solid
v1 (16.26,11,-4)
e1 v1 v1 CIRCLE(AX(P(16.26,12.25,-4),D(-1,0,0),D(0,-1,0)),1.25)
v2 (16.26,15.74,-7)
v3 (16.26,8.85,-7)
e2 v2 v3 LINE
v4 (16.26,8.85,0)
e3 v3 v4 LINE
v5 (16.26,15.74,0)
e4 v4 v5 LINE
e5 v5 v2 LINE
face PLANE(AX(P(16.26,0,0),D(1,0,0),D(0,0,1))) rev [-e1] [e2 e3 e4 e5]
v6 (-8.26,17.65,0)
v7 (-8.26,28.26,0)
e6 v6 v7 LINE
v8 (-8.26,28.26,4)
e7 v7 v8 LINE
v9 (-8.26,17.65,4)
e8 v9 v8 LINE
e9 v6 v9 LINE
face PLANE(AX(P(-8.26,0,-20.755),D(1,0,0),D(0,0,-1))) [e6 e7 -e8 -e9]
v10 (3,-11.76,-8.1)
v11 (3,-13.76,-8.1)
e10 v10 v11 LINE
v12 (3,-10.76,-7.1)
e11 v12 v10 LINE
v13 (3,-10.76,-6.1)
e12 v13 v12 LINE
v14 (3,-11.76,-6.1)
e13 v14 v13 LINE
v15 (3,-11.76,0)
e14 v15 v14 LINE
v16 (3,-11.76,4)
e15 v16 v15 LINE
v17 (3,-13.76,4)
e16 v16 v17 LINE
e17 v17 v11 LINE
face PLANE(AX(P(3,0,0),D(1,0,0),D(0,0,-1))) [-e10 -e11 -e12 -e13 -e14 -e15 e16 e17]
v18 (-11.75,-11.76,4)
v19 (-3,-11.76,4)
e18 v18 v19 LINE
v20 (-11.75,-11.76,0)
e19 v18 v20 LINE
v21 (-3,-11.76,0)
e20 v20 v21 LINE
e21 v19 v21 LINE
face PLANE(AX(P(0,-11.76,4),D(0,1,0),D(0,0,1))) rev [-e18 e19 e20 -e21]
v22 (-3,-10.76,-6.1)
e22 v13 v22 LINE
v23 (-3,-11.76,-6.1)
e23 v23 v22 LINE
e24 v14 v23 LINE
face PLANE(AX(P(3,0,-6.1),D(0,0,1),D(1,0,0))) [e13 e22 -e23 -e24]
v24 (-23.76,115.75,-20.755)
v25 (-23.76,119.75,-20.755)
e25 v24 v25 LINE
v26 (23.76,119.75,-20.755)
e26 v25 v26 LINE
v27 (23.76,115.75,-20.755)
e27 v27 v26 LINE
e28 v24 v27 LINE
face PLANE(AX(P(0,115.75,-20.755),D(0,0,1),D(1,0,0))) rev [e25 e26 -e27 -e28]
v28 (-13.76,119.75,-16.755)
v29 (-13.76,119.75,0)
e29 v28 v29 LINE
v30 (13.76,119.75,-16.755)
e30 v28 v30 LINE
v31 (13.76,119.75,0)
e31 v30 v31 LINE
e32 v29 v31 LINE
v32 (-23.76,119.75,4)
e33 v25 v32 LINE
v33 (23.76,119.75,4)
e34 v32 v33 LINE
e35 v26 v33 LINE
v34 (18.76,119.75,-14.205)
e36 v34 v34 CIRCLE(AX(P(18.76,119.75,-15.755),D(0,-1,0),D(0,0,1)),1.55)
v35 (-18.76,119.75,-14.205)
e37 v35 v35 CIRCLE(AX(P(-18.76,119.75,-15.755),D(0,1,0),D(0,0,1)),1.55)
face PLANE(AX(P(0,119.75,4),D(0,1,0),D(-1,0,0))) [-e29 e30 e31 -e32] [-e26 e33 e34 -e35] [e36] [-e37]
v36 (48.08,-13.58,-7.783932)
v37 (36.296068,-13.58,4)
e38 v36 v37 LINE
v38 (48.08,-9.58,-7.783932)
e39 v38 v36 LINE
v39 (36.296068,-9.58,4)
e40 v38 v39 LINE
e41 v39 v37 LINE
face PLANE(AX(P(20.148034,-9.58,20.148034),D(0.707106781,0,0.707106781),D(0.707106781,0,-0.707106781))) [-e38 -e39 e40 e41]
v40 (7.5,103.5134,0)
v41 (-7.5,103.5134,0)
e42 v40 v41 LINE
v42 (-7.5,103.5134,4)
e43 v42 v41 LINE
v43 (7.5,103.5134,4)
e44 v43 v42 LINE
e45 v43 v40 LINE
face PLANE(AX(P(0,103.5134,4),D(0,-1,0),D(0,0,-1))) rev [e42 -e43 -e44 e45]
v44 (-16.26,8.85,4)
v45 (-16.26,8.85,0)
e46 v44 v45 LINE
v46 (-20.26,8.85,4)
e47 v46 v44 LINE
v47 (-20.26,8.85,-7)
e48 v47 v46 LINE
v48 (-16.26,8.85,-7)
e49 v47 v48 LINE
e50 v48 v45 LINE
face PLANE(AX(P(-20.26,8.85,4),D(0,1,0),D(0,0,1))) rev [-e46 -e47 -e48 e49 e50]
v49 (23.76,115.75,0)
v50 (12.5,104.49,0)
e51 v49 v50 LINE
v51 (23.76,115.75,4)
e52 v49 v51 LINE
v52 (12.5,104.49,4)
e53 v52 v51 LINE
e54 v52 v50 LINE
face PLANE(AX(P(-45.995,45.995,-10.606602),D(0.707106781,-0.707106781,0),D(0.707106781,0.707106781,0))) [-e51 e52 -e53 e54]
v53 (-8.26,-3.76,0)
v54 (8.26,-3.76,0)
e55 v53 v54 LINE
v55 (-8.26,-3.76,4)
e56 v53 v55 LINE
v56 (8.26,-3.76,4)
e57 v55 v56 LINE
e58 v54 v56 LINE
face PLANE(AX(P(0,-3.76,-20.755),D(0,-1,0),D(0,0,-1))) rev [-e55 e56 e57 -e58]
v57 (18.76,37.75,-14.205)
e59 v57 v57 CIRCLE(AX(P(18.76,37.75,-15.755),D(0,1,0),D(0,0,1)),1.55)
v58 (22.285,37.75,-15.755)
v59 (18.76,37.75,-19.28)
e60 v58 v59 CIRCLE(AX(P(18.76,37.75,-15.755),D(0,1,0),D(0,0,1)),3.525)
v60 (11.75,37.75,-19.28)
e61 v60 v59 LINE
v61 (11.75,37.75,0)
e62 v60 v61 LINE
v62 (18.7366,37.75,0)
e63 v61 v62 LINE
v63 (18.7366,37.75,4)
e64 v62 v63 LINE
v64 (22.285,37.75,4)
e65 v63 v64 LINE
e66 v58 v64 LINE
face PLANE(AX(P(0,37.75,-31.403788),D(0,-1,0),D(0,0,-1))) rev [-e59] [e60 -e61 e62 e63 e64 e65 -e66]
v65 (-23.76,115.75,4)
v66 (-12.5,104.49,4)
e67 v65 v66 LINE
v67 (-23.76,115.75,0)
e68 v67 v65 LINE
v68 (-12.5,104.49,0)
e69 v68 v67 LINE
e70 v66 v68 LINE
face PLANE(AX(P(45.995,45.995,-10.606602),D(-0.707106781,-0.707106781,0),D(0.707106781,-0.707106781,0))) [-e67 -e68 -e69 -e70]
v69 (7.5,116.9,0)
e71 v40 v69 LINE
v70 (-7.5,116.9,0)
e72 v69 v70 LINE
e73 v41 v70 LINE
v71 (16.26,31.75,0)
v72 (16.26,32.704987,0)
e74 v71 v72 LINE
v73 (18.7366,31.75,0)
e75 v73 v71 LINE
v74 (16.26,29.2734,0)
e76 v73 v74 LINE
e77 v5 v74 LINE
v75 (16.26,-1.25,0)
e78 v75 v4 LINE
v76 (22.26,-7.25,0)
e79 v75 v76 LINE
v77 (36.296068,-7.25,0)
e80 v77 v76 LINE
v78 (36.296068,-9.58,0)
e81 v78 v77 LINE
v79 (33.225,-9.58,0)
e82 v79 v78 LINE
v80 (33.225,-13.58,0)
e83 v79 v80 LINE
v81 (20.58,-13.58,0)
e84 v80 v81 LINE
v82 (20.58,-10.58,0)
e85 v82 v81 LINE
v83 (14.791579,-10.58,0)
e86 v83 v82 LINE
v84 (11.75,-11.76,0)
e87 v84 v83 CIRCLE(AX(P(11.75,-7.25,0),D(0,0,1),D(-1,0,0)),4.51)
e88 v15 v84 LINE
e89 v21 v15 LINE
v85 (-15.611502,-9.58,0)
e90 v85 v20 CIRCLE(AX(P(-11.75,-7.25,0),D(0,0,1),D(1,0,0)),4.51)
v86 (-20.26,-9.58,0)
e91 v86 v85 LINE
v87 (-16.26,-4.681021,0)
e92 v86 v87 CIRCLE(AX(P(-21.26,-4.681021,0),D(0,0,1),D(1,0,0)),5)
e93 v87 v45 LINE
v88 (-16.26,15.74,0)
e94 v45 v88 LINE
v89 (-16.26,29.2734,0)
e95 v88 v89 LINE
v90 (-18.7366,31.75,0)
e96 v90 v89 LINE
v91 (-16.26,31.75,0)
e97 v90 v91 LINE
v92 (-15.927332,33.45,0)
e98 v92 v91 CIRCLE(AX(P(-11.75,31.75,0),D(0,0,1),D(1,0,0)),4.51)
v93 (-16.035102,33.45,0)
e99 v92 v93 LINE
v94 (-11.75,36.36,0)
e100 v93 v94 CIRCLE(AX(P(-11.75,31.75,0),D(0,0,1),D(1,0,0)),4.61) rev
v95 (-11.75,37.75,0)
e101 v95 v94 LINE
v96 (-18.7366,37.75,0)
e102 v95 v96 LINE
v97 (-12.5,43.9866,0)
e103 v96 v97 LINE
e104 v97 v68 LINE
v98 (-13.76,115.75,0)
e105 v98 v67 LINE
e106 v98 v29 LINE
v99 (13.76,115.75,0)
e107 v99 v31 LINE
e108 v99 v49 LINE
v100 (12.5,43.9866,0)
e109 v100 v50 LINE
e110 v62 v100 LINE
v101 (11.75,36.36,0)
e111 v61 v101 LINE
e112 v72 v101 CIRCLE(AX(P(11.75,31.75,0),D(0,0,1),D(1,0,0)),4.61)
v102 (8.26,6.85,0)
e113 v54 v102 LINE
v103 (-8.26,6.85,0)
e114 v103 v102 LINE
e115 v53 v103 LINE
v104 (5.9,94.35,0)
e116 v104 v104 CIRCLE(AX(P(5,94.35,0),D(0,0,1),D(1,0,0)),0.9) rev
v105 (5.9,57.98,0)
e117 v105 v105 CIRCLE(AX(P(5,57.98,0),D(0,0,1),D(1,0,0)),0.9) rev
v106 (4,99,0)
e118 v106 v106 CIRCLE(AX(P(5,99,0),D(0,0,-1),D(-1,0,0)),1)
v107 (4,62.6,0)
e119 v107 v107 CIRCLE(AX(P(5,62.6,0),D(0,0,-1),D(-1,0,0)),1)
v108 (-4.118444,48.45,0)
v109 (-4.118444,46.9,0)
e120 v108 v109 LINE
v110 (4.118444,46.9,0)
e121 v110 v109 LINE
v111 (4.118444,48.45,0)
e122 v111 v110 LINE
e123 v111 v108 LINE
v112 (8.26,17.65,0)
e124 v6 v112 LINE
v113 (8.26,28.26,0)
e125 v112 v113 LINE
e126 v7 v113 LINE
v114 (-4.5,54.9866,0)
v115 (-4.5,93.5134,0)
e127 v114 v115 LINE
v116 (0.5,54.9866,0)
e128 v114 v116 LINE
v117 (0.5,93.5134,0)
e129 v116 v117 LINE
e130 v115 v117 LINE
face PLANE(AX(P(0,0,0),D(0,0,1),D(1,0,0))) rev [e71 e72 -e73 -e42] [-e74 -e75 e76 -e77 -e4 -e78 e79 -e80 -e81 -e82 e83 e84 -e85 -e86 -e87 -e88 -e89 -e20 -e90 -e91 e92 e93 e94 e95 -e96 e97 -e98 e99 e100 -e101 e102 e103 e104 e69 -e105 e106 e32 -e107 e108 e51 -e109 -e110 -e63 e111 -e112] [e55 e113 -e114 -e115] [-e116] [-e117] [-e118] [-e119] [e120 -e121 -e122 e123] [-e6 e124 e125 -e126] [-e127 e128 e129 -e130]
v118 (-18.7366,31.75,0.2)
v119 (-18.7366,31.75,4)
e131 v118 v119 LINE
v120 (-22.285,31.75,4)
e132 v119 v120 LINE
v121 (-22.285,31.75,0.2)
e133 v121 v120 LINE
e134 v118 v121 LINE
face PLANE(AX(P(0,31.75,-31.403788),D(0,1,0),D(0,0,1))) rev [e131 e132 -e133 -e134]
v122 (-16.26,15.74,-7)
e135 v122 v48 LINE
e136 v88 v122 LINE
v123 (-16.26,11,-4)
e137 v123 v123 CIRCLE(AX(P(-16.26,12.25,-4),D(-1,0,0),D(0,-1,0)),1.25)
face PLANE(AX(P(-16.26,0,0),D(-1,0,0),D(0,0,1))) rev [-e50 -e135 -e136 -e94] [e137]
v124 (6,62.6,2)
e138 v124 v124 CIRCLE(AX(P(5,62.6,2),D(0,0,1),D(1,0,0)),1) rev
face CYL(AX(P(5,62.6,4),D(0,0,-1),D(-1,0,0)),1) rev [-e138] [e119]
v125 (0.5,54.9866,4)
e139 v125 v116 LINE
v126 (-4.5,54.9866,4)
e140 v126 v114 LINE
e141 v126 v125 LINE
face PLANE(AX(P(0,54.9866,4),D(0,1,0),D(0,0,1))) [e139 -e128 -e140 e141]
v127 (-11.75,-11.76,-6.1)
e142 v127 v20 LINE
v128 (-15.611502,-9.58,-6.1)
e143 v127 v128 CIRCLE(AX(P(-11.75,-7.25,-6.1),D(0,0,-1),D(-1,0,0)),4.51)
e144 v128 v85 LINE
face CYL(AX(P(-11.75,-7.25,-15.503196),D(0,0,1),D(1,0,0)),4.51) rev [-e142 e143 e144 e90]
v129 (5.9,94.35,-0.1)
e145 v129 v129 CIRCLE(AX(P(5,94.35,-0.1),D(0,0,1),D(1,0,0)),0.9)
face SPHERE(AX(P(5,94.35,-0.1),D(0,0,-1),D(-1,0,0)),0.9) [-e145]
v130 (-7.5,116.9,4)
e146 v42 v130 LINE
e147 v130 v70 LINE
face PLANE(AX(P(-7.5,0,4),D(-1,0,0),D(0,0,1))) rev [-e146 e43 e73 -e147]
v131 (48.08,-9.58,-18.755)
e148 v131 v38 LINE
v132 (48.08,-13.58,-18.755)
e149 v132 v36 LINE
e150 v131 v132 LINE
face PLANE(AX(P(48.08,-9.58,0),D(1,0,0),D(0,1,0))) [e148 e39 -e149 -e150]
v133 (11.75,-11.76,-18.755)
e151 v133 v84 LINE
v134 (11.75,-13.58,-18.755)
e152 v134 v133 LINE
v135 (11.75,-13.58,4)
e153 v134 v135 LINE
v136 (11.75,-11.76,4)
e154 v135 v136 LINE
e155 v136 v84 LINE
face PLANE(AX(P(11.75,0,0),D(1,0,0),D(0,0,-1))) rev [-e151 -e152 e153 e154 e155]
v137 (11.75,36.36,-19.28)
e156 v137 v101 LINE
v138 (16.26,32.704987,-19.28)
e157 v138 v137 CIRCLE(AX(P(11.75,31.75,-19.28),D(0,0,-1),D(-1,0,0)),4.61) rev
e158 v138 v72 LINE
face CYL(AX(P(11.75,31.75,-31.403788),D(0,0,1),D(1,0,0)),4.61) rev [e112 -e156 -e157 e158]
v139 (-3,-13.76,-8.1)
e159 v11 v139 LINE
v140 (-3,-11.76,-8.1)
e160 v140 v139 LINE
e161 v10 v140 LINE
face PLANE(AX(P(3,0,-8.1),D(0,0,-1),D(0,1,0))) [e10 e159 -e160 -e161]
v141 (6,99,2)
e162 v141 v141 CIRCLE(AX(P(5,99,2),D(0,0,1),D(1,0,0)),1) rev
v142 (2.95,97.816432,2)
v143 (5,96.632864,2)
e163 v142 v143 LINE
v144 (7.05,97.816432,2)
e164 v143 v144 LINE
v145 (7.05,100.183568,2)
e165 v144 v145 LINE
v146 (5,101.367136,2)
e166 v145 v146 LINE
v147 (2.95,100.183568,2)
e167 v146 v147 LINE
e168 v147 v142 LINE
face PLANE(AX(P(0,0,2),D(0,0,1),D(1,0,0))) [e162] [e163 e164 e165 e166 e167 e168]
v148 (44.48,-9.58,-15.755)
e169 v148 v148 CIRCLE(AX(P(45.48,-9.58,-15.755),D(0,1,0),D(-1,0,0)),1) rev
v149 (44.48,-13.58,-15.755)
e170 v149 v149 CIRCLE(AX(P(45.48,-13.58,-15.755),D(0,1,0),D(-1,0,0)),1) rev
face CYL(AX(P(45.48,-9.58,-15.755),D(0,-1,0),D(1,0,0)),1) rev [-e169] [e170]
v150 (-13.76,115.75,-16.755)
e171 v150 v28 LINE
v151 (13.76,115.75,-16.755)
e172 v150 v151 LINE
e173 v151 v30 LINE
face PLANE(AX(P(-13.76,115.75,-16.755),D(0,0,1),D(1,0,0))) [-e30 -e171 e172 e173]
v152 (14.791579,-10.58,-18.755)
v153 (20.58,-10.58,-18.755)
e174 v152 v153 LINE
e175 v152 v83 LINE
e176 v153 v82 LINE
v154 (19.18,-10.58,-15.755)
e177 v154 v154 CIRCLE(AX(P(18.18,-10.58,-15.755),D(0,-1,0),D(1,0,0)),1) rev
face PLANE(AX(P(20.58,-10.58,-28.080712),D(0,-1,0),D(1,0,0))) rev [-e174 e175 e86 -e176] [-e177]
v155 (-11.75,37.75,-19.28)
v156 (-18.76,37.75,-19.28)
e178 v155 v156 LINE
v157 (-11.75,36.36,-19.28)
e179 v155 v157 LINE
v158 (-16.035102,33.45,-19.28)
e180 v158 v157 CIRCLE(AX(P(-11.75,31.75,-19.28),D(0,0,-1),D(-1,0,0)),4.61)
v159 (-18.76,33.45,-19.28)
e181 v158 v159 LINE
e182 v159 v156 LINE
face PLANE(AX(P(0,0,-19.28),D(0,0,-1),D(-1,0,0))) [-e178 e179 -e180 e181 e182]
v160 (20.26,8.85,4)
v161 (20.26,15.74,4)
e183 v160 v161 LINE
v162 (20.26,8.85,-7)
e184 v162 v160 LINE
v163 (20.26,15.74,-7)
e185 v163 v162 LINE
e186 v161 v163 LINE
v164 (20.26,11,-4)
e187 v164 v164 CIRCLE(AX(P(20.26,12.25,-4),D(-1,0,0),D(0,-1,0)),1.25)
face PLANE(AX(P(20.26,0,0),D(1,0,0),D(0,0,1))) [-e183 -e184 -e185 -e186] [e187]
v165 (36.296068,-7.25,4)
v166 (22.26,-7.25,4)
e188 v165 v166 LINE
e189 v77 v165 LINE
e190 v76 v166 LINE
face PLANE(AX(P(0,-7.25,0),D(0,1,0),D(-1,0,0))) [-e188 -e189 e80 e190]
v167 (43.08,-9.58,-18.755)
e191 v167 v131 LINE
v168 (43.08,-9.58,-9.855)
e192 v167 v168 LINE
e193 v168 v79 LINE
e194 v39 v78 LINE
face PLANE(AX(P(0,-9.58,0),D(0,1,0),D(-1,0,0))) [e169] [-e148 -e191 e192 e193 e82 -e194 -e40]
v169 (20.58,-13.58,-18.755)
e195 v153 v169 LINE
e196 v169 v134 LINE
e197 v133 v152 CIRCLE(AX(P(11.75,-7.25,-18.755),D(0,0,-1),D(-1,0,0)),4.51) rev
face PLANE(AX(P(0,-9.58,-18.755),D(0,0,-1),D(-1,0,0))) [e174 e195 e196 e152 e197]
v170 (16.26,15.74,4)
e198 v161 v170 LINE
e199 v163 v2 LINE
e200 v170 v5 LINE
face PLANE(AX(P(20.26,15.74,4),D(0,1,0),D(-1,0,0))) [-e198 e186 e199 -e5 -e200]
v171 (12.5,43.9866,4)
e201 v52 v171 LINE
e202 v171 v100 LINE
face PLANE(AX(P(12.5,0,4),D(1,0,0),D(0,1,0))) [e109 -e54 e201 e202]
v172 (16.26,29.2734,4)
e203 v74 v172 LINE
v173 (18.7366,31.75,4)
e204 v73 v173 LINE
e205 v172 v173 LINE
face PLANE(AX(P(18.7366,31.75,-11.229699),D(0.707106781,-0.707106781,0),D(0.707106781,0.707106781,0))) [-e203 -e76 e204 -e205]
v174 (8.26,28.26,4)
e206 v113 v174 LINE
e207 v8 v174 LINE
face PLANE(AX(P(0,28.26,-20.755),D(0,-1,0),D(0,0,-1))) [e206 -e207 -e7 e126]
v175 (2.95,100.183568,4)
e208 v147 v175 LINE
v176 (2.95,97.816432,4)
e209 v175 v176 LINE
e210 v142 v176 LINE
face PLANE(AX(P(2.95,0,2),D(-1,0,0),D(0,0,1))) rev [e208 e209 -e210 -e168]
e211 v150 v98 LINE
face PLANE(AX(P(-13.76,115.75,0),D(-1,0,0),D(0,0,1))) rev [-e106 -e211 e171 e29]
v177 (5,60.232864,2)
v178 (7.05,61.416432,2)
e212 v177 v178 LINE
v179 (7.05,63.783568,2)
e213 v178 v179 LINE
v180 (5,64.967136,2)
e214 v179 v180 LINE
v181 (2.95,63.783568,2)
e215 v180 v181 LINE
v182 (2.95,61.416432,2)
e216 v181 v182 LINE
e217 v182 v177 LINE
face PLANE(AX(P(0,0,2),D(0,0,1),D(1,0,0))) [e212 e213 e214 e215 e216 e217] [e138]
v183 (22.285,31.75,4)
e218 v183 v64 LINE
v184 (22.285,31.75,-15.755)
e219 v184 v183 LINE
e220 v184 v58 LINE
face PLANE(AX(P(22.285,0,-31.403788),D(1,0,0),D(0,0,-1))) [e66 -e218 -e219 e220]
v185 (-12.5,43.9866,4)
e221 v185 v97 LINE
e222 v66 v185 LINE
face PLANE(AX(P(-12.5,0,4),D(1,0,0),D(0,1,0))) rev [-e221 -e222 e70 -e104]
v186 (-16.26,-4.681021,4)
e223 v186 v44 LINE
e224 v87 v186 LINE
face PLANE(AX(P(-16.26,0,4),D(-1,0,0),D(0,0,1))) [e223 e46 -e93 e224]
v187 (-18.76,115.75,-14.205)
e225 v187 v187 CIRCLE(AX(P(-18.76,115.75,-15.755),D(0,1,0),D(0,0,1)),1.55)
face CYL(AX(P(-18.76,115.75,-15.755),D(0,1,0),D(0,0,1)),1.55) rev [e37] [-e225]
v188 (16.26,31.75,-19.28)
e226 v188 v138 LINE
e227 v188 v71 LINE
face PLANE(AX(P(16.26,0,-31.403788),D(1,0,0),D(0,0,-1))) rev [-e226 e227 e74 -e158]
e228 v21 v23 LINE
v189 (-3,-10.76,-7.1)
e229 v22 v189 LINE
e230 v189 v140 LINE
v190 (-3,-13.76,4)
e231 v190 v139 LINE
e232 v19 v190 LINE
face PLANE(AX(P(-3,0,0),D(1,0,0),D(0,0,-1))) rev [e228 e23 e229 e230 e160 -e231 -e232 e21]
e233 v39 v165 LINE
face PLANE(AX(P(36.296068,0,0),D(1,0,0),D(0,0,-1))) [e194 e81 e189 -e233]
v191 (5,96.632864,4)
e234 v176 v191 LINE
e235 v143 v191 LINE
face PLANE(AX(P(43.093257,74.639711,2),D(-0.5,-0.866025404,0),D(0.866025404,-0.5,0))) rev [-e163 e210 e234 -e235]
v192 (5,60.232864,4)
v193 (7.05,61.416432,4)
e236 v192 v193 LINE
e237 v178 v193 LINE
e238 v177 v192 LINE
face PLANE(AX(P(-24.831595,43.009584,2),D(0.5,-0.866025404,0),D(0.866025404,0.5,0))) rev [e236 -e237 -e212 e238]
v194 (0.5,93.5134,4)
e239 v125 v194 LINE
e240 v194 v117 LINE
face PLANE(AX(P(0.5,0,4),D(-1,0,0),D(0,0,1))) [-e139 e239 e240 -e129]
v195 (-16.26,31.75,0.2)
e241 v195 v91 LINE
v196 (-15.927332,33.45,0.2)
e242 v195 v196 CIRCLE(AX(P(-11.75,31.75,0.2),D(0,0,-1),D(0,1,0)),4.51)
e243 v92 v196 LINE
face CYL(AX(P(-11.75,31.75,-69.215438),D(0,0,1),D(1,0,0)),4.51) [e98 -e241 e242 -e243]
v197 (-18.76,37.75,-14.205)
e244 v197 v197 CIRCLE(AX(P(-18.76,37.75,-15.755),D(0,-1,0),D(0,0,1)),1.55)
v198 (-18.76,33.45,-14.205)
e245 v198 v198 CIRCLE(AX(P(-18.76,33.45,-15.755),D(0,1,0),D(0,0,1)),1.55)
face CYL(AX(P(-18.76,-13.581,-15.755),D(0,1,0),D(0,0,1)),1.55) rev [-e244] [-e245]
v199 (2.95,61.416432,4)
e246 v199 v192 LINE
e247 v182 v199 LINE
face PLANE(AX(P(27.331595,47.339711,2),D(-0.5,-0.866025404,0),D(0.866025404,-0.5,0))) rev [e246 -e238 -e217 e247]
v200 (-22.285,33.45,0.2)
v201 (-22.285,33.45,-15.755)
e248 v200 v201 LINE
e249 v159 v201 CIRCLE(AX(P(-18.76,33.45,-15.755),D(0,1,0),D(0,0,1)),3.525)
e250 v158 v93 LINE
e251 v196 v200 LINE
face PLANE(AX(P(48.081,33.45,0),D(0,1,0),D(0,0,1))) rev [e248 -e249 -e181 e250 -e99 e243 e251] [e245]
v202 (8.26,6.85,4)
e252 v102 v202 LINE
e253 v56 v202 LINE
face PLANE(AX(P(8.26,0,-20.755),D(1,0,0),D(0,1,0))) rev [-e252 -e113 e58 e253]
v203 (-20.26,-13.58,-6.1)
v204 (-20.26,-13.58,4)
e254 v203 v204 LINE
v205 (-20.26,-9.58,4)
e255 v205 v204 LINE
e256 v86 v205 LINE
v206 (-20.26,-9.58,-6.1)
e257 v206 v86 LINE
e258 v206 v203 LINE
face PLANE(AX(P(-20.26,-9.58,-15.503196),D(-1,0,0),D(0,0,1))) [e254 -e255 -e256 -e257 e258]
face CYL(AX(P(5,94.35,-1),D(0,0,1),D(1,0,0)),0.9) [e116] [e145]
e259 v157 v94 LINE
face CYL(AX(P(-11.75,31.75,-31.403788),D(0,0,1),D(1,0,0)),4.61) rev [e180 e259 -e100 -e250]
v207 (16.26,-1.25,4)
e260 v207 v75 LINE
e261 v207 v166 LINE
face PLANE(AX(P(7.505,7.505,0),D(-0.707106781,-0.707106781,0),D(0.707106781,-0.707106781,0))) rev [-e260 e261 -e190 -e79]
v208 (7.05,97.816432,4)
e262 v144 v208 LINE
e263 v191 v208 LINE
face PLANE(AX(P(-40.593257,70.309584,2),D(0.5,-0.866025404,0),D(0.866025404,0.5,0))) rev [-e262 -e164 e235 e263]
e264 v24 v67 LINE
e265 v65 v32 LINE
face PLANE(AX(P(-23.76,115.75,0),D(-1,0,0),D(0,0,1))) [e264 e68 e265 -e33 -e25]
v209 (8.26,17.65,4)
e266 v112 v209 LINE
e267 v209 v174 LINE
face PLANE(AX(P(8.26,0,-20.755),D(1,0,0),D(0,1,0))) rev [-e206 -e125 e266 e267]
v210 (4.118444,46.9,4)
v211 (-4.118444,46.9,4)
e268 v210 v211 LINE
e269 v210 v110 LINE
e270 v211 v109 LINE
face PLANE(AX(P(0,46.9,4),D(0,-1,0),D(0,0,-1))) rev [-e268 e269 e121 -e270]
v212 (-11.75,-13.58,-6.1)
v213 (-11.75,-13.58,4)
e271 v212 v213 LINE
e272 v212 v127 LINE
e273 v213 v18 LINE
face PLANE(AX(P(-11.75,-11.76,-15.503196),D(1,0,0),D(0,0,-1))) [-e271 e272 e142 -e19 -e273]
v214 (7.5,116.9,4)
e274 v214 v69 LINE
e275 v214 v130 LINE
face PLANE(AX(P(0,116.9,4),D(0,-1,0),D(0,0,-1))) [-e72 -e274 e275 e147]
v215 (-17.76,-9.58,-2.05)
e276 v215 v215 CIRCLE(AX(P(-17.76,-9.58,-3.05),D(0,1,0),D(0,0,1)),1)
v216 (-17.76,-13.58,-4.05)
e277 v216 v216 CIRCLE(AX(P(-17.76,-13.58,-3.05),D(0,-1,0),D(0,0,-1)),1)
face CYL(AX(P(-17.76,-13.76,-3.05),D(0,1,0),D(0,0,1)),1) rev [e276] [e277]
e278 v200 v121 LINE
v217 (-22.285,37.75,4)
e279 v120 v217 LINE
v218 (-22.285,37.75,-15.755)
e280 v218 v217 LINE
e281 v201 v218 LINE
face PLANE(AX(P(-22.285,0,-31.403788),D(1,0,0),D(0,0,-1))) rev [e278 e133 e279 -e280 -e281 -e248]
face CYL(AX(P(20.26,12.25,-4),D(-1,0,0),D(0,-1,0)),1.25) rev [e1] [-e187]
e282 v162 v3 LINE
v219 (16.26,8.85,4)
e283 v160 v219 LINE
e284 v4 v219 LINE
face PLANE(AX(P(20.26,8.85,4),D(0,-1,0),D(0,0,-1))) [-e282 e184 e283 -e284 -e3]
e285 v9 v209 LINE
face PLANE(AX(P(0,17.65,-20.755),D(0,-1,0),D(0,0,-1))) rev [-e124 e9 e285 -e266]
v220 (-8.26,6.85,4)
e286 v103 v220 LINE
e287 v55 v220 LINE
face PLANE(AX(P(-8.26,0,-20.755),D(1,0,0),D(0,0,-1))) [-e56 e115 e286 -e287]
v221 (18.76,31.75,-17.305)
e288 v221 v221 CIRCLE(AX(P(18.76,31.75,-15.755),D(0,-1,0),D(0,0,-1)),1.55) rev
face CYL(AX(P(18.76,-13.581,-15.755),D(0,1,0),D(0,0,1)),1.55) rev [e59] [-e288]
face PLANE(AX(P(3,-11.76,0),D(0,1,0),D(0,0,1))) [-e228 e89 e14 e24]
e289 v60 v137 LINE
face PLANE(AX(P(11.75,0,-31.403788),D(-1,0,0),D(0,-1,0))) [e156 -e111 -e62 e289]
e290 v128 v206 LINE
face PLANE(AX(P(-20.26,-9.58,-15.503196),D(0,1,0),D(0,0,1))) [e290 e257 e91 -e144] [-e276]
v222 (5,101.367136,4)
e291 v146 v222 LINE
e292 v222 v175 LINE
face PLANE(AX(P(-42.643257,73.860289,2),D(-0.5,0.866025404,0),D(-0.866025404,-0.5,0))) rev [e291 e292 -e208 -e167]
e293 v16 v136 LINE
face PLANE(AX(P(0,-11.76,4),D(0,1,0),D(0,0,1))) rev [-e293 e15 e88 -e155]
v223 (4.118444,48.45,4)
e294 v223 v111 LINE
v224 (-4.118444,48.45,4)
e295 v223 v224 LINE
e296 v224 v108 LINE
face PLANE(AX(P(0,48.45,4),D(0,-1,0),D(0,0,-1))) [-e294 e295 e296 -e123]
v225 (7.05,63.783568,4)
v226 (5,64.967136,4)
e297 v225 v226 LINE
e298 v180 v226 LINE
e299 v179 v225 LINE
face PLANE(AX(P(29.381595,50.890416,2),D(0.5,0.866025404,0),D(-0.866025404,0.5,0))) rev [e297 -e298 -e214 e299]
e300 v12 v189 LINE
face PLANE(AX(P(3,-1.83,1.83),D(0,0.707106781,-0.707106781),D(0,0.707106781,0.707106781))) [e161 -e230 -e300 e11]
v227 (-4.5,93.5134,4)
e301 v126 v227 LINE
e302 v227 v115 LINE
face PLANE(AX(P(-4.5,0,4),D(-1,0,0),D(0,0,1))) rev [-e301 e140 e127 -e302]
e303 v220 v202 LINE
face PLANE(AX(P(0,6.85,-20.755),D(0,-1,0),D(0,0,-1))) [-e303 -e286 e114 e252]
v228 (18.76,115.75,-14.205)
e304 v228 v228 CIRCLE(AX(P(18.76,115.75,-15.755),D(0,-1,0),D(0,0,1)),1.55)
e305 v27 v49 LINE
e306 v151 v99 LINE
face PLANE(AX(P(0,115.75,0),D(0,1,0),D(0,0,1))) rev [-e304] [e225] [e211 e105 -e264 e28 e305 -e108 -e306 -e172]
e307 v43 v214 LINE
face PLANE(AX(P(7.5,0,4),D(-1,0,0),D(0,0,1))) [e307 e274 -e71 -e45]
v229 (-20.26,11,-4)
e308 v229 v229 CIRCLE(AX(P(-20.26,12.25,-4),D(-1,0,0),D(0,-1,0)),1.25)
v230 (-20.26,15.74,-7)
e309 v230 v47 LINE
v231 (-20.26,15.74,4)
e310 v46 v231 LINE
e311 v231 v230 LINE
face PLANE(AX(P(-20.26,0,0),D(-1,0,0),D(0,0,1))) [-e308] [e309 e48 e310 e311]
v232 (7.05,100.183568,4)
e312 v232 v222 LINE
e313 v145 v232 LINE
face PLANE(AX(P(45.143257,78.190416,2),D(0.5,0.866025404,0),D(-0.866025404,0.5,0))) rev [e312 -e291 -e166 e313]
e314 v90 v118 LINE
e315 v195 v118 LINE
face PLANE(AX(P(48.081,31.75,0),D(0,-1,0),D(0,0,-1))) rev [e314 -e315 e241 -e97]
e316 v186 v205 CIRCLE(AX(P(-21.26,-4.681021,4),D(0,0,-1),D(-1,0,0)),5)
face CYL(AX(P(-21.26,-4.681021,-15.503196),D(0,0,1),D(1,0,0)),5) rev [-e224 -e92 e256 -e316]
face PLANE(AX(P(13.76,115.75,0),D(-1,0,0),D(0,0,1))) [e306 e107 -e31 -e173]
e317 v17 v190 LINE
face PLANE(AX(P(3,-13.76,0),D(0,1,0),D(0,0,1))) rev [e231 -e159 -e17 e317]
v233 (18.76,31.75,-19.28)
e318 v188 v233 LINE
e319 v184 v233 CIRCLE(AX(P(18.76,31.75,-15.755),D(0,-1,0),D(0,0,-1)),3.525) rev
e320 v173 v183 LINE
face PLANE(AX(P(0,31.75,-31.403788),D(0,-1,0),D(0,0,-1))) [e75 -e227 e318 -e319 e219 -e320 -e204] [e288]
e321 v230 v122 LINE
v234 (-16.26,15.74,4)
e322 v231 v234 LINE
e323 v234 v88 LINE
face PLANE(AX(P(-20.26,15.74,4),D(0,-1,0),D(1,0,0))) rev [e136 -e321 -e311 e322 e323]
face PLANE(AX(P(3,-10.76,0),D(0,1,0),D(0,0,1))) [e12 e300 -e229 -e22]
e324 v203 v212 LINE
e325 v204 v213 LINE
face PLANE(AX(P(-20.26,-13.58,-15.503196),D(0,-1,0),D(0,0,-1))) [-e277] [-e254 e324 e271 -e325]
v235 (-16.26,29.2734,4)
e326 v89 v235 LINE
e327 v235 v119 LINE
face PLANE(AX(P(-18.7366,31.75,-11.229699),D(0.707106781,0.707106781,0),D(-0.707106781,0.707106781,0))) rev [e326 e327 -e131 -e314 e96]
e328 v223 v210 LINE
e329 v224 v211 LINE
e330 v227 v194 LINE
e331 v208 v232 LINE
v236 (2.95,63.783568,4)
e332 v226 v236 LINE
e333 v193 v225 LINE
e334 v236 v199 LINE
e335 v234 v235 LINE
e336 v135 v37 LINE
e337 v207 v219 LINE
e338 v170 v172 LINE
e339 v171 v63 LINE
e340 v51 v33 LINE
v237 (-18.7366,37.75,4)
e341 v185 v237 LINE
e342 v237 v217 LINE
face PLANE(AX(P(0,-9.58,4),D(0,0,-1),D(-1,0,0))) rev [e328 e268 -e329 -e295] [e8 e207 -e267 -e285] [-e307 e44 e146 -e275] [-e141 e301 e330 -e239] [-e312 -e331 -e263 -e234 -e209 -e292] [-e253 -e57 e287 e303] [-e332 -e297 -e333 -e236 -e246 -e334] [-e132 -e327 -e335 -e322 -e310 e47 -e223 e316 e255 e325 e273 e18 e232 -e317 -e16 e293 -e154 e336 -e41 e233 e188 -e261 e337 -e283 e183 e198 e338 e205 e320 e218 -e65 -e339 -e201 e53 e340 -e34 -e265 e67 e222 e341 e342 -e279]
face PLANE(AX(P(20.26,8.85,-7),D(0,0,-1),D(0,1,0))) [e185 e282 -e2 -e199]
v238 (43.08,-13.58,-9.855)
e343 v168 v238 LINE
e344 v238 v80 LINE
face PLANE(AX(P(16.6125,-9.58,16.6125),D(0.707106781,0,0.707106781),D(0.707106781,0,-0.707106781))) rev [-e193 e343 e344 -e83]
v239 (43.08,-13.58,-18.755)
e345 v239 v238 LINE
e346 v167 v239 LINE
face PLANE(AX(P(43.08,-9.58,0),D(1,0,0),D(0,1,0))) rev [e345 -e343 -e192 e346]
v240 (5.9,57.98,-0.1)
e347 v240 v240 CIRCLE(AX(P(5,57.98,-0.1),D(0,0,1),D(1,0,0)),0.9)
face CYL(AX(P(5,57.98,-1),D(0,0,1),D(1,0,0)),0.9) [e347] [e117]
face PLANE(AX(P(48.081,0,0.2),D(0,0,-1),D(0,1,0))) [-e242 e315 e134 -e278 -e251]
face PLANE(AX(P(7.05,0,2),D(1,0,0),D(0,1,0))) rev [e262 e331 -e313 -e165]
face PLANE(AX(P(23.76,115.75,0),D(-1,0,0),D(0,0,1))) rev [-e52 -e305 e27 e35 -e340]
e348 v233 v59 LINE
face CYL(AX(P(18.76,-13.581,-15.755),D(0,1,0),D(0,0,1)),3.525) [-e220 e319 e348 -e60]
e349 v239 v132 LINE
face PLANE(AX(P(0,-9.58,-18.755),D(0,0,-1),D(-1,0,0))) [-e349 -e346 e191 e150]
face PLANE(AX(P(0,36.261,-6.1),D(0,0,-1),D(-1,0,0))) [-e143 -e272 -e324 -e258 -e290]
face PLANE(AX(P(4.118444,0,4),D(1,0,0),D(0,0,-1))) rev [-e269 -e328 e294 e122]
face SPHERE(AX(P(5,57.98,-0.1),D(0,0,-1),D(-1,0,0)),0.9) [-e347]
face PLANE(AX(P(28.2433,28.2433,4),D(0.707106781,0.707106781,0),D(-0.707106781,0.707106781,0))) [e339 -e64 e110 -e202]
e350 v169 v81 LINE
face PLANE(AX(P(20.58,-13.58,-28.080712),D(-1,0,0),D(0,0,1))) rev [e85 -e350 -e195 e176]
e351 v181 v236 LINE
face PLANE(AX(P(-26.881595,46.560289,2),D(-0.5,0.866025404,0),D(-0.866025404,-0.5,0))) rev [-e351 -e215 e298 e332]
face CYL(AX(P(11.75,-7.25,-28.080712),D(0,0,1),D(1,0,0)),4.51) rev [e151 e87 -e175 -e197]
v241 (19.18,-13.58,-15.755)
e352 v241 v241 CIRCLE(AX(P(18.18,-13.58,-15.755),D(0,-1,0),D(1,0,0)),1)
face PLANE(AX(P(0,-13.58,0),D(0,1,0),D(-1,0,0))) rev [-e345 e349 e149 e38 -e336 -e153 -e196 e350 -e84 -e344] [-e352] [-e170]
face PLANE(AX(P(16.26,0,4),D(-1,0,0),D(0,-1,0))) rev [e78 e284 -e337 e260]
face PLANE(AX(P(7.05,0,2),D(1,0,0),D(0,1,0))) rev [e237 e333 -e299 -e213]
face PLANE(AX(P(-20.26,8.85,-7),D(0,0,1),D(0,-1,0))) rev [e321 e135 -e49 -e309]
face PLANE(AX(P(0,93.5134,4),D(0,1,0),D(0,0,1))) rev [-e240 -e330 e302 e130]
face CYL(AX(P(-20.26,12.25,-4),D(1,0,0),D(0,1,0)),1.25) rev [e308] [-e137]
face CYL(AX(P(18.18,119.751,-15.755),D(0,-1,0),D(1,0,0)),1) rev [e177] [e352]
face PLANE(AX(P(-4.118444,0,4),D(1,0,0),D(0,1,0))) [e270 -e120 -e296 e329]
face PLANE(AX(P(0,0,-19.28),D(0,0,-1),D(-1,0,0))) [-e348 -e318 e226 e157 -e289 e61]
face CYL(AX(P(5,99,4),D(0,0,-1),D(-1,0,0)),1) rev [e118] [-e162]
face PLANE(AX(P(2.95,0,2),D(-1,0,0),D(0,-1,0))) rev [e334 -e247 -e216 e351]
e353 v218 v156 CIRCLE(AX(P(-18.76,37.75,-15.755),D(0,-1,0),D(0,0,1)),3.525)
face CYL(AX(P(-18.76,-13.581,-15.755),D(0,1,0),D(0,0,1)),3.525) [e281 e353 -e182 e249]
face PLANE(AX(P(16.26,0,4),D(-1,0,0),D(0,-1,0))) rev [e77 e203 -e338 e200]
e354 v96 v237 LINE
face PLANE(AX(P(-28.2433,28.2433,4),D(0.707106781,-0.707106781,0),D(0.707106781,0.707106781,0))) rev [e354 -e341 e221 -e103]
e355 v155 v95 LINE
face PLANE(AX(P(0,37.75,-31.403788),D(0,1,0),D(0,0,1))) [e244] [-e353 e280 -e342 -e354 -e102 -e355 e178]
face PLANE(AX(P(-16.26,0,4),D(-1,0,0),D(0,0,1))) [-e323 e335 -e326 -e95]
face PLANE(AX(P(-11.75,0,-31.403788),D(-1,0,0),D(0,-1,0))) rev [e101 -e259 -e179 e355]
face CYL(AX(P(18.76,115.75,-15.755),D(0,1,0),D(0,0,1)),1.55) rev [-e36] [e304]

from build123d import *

# Parameters (mm, degrees)
EXTRUDE_1_DEPTH      = 4
SKETCH_2_W           = 15
SKETCH_2_H           = 13.3866
CUT_EXTRUDE_1_DEPTH  = 121.91505324
SKETCH_3_W           = 10
SKETCH_3_H           = 10
SKETCH_3_R           = 1.55
SKETCH_3_H_2         = 14.755
EXTRUDE_2_DEPTH      = 4
EXTRUDE_3_DEPTH      = 4
EXTRUDE_4_DEPTH      = 4
SKETCH_7_W           = 27.52
SKETCH_7_H           = 4
EXTRUDE_5_DEPTH      = 4
EXTRUDE_START        = -4
EXTRUDE_6_DEPTH      = 4
SKETCH_11_W          = 16.52
SKETCH_11_H          = 10.61
CUT_EXTRUDE_2_DEPTH  = 132.394668556
SKETCH_12_W          = 11
SKETCH_12_H          = 6.89
SKETCH_12_R          = 1.25
EXTRUDE_7568_DEPTH   = 4
SKETCH_14_R          = 1
CUT_EXTRUDE_3_DEPTH  = 131.700110654
SKETCH_15_R          = 0.9
EXTRUDE_9_DEPTH      = 1
FILLET_1_R           = 0.9
CUT_EXTRUDE_START    = -2
SKETCH_16_R          = 1
CUT_EXTRUDE_4_DEPTH  = 2
CUT_EXTRUDE_5_DEPTH  = 131.700110654
SKETCH_19_W          = 5
SKETCH_19_H          = 38.5268
SKETCH_19_W_2        = 8.236887868
SKETCH_19_H_2        = 1.55
CUT_EXTRUDE_6_DEPTH  = 131.700110654
EXTRUDE_12_DEPTH     = 23.28
CUT_EXTRUDE_7_REACH  = 99.296
SKETCH_23_R          = 1.55
EXTRUDE_13_DEPTH     = 4
CUT_EXTRUDE_START_2  = -19.28
CUT_EXTRUDE_8_DEPTH  = 19.48
SKETCH_26_W          = 10.1
SKETCH_26_H          = 2
EXTRUDE_14_DEPTH     = 3
EXTRUDE_15_DEPTH     = 18.755
CUT_EXTRUDE_9_REACH  = 145.246
SKETCH_28_R          = 1
EXTRUDE_START_2      = -10.1
EXTRUDE_16_DEPTH     = 10.1
FILLET_2_R           = 5
SKETCH_30_R          = 1
CUT_EXTRUDE_10_DEPTH = 140.530302533


# Read off the part's stored shape, not the designer's step: 切除-拉伸8
with BuildPart() as part:
    # 草图1 → 凸台-拉伸1 (new body)
    with BuildSketch(Plane.XY):
        with BuildLine():
            Line((-16.26, -7.25), (-16.26, 119.75))
            Line((-16.26, 119.75), (16.26, 119.75))
            Line((16.26, 119.75), (16.26, -7.25))
            ThreePointArc((16.26, -7.25), (14.939051583, -10.439051583), (11.75, -11.76))
            Line((11.75, -11.76), (-11.75, -11.76))
            ThreePointArc((-11.75, -11.76), (-14.939051583, -10.439051583), (-16.26, -7.25))
        make_face()
    extrude(amount=EXTRUDE_1_DEPTH)

    # 草图2 → 切除-拉伸1 (cut, through all)
    with BuildSketch(Plane(origin=(0, 0, 0), x_dir=(-1, 0, 0), z_dir=(0, 0, -1))):
        with Locations((0, 110.2067)):
            Rectangle(SKETCH_2_W, SKETCH_2_H)
    extrude(amount=-CUT_EXTRUDE_1_DEPTH, mode=Mode.SUBTRACT)

    # 草图3 → 凸台-拉伸2 (add)
    # profile 1 of 2: a face of its own
    with BuildSketch(Plane(origin=(0, 119.75, 0), x_dir=(1, 0, 0), z_dir=(0, 1, 0))):
        with Locations((-18.76, 15.755)):
            Rectangle(SKETCH_3_W, SKETCH_3_H)
        with Locations(Location((-18.76, 15.755, 0), (0, 0, 270))):
            Circle(SKETCH_3_R, mode=Mode.SUBTRACT)
    # profile 2 of 2: a face of its own
    with BuildSketch(Plane(origin=(0, 119.75, 0), x_dir=(1, 0, 0), z_dir=(0, 1, 0))):
        with Locations((-18.76, 3.3775)):
            Rectangle(SKETCH_3_W, SKETCH_3_H_2)
    extrude_2 = extrude(amount=-EXTRUDE_2_DEPTH)

    # 镜向1: 凸台-拉伸2 across plane
    add(extrude_2.mirror(Plane(origin=(0, 0, 0), x_dir=(0, 0, 1), z_dir=(1, 0, 0))))

    # 草图6 → 凸台-拉伸4 (add)
    with BuildSketch(Plane.XY.offset(4)):
        Polygon((-16.26, 115.75), (-23.76, 115.75), (-16.26, 108.25), align=None)
        Polygon((16.26, 115.75), (16.26, 108.25), (23.76, 115.75), align=None)
    extrude(amount=-EXTRUDE_4_DEPTH)

    # 草图7 → 凸台-拉伸5 (add)
    with BuildSketch(Plane(origin=(0, 119.75, 0), x_dir=(1, 0, 0), z_dir=(0, 1, 0))):
        with Locations((0, 18.755)):
            Rectangle(SKETCH_7_W, SKETCH_7_H)
    extrude(amount=-EXTRUDE_5_DEPTH)



with BuildPart() as body_2:
    # 草图5 → 凸台-拉伸3 (new body)
    with BuildSketch(Plane(origin=(0, -13.58, 0), x_dir=(1, 0, 0), z_dir=(0, 1, 0))):
        Polygon((47.78, 9.855), (43.08, 9.855), (29.225, -4), (36.296067812, -4), (48.08, 7.783932188), (48.08, 9.855), align=None)
        with BuildLine():
            Line((47.78, 18.755), (43.08, 18.755))
            Line((43.08, 18.755), (43.08, 9.855))
            Line((43.08, 9.855), (47.78, 9.855))
            Line((47.78, 9.855), (47.78, 15.105))
            Line((47.78, 15.105), (46.239934208, 15.105))
            ThreePointArc((46.239934208, 15.105), (44.48, 15.755), (46.239934208, 16.405))
            Line((46.239934208, 16.405), (47.78, 16.405))
            Line((47.78, 16.405), (47.78, 18.755))
        make_face()
        with BuildLine():
            Line((48.08, 18.755), (47.78, 18.755))
            Line((47.78, 18.755), (47.78, 16.405))
            Line((47.78, 16.405), (46.239934208, 16.405))
            ThreePointArc((46.239934208, 16.405), (46.418065618, 16.10145764), (46.48, 15.755))
            ThreePointArc((46.48, 15.755), (46.418065618, 15.40854236), (46.239934208, 15.105))
            Line((46.239934208, 15.105), (47.78, 15.105))
            Line((47.78, 15.105), (47.78, 9.855))
            Line((47.78, 9.855), (48.08, 9.855))
            Line((48.08, 9.855), (48.08, 18.755))
        make_face()
    extrude(amount=EXTRUDE_3_DEPTH)


with BuildPart() as part_1:
    add(part.part)

    add(body_2.part)  # 凸台-拉伸6 merges body 2
    # 草图8 → 凸台-拉伸6 (add)
    with BuildSketch(Plane.XY.offset(4).offset(EXTRUDE_START)):
        with BuildLine():
            Line((22.26, -7.25), (16.26, -7.25))
            ThreePointArc((16.26, -7.25), (14.939051583, -10.439051583), (11.75, -11.76))
            Line((11.75, -11.76), (11.75, -13.58))
            Line((11.75, -13.58), (36.296067812, -13.58))
            Line((36.296067812, -13.58), (36.296067812, -7.25))
            Line((36.296067812, -7.25), (22.26, -7.25))
        make_face()
        with BuildLine():
            Line((16.26, -7.25), (11.75, -7.25))
            Line((11.75, -7.25), (11.75, -11.76))
            ThreePointArc((11.75, -11.76), (14.939051583, -10.439051583), (16.26, -7.25))
        make_face()
        Polygon((11.75, 3.26), (11.75, -7.25), (16.26, -7.25), (16.26, -1.25), align=None)
        Polygon((16.26, -1.25), (16.26, -7.25), (22.26, -7.25), align=None)
    extrude(amount=EXTRUDE_6_DEPTH)

    # 草图11 → 切除-拉伸2 (cut, through all)
    with BuildSketch(Plane.XY.offset(4)):
        with Locations((0, 1.545)):
            Rectangle(SKETCH_11_W, SKETCH_11_H)
        with Locations((0, 22.955)):
            Rectangle(SKETCH_11_W, SKETCH_11_H)
    extrude(amount=-CUT_EXTRUDE_2_DEPTH, mode=Mode.SUBTRACT)

    # 草图12 → Extrude 7568 (add)
    with BuildSketch(Plane.ZY.offset(16.26)):
        with Locations((-1.5, 12.295)):
            Rectangle(SKETCH_12_W, SKETCH_12_H)
        with Locations(Location((-4, 12.25, 0), (0, 0, 270))):
            Circle(SKETCH_12_R, mode=Mode.SUBTRACT)
    extrude_7568 = extrude(amount=EXTRUDE_7568_DEPTH)

    # 镜向4: Extrude 7568 across plane
    add(extrude_7568.mirror(Plane(origin=(0, 0, 0), x_dir=(0, 0, 1), z_dir=(1, 0, 0))))

    # 草图14 → 切除-拉伸3 (cut, through all)
    with BuildSketch(Plane(origin=(0, 0, 0), x_dir=(-1, 0, 0), z_dir=(0, 0, -1))):
        with Locations((-5, 62.6)):
            Circle(SKETCH_14_R)
        with Locations((-5, 99)):
            Circle(SKETCH_14_R)
    extrude(amount=-CUT_EXTRUDE_3_DEPTH, mode=Mode.SUBTRACT)

    # 草图15 → 凸台-拉伸9 (add)
    with BuildSketch(Plane(origin=(0, 0, 0), x_dir=(-1, 0, 0), z_dir=(0, 0, -1))):
        with Locations(Location((-5, 94.35, 0), (0, 0, 180))):
            Circle(SKETCH_15_R)
        with Locations(Location((-5, 57.98, 0), (0, 0, 180))):
            Circle(SKETCH_15_R)
    extrude(amount=EXTRUDE_9_DEPTH)

    # 圆角1
    fillet_1_edges = [part_1.edges().sort_by_distance(p)[0] for p in [
        (4.1, 94.35, -1),
        (4.1, 57.98, -1),
    ]]
    fillet(fillet_1_edges, radius=FILLET_1_R)

    # 草图16 → 切除-拉伸4 (cut)
    # profile 1 of 2: a face of its own
    with BuildSketch(Plane.XY.offset(4).offset(CUT_EXTRUDE_START)):
        Polygon((7.05, 61.416431948), (7.05, 63.783568052), (5, 64.967136104), (2.95, 63.783568052), (2.95, 61.416431948), (5, 60.232863896), align=None)
        with Locations(Location((5, 62.6, 0), (0, 0, 180))):
            Circle(SKETCH_16_R, mode=Mode.SUBTRACT)
    # profile 2 of 2: a face of its own
    with BuildSketch(Plane.XY.offset(4).offset(CUT_EXTRUDE_START)):
        Polygon((2.95, 97.816431948), (5, 96.632863896), (7.05, 97.816431948), (7.05, 100.183568052), (5, 101.367136104), (2.95, 100.183568052), align=None)
        with Locations(Location((5, 99, 0), (0, 0, 180))):
            Circle(SKETCH_16_R, mode=Mode.SUBTRACT)
    extrude(amount=CUT_EXTRUDE_4_DEPTH, mode=Mode.SUBTRACT)

    # 草图17 → 切除-拉伸5 (cut, symmetric)
    with BuildSketch(Plane(origin=(0, 0, 0), x_dir=(-1, 0, 0), z_dir=(0, 0, -1))):
        Polygon((-12.5, 104.49), (-16.26, 108.25), (-16.26, 40.2266), (-12.5, 43.9866), align=None)
    cut_extrude_5 = extrude(amount=CUT_EXTRUDE_5_DEPTH, both=True, mode=Mode.SUBTRACT)

    # 镜向2: 切除-拉伸5 across plane
    add(cut_extrude_5.mirror(Plane(origin=(0, 0, 0), x_dir=(0, 0, 1), z_dir=(1, 0, 0))), mode=Mode.SUBTRACT)

    # 草图19 → 切除-拉伸6 (cut, through all)
    with BuildSketch(Plane(origin=(0, 0, 0), x_dir=(-1, 0, 0), z_dir=(0, 0, -1))):
        with Locations((2, 74.25)):
            Rectangle(SKETCH_19_W, SKETCH_19_H)
        with Locations((0, 47.675)):
            Rectangle(SKETCH_19_W_2, SKETCH_19_H_2)
    extrude(amount=-CUT_EXTRUDE_6_DEPTH, mode=Mode.SUBTRACT)

    # 草图22 → 凸台-拉伸12 (add)
    with BuildSketch(Plane.XY.offset(4)):
        with BuildLine():
            Line((16.26, 32.704986911), (16.26, 31.75))
            Line((16.26, 31.75), (22.285, 31.75))
            Line((22.285, 31.75), (22.285, 37.75))
            Line((22.285, 37.75), (11.75, 37.75))
            Line((11.75, 37.75), (11.75, 36.36))
            ThreePointArc((11.75, 36.36), (14.652551493, 35.331521301), (16.26, 32.704986911))
        make_face()
    extrude_12 = extrude(amount=-EXTRUDE_12_DEPTH)

    # 草图23 → 切除-拉伸7 (cut, up to next)
    with BuildSketch(Plane(origin=(0, 37.75, 0), x_dir=(1, 0, 0), z_dir=(0, 1, 0)), mode=Mode.PRIVATE) as cut_extrude_7_sk1:
        with Locations(Location((18.76, 15.755, 0), (0, 0, 270))):
            Circle(SKETCH_23_R)
    cut_extrude_7_tool1 = extrude(cut_extrude_7_sk1.sketch, amount=-CUT_EXTRUDE_7_REACH, mode=Mode.PRIVATE) & part_1.part
    # 草图23 → 切除-拉伸7 (cut, up to next)
    with BuildSketch(Plane(origin=(0, 37.75, 0), x_dir=(1, 0, 0), z_dir=(0, 1, 0)), mode=Mode.PRIVATE) as cut_extrude_7_sk2:
        with BuildLine():
            ThreePointArc((18.76, 19.28), (21.252551404, 18.247551404), (22.285, 15.755))
            Line((22.285, 15.755), (22.285, 19.28))
            Line((22.285, 19.28), (18.76, 19.28))
        make_face()
    cut_extrude_7_tool2 = extrude(cut_extrude_7_sk2.sketch, amount=-CUT_EXTRUDE_7_REACH, mode=Mode.PRIVATE) & part_1.part
    cut_extrude_7_1 = cut_extrude_7_tool1.solids().sort_by_distance((18.76, 37.75, -15.755))[0]
    add(cut_extrude_7_1, mode=Mode.SUBTRACT)
    cut_extrude_7_2 = cut_extrude_7_tool2.solids().sort_by_distance((21.497628, 37.75, -18.492628))[0]
    add(cut_extrude_7_2, mode=Mode.SUBTRACT)
    cut_extrude_7 = cut_extrude_7_1 + cut_extrude_7_2  # 切除-拉伸7 as one shape, for the pattern or mirror that repeats it

    # 草图24 → 凸台-拉伸13 (add)
    with BuildSketch(Plane.XY.offset(4)):
        Polygon((16.26, 40.2266), (18.7366, 37.75), (18.7366, 31.75), (16.26, 29.2734), align=None)
    extrude_13 = extrude(amount=-EXTRUDE_13_DEPTH)

    # 镜向3: 凸台-拉伸12, 切除-拉伸7, 凸台-拉伸13 across plane
    add(extrude_12.mirror(Plane(origin=(0, 0, 0), x_dir=(0, 0, 1), z_dir=(1, 0, 0))))
    add(cut_extrude_7.mirror(Plane(origin=(0, 0, 0), x_dir=(0, 0, 1), z_dir=(1, 0, 0))), mode=Mode.SUBTRACT)
    add(extrude_13.mirror(Plane(origin=(0, 0, 0), x_dir=(0, 0, 1), z_dir=(1, 0, 0))))

    # 切除-拉伸8 outline → 切除-拉伸8 (cut)
    with BuildSketch(Plane.XY.offset(CUT_EXTRUDE_START_2)):
        with BuildLine():
            ThreePointArc((-16.26, 31.75), (-16.176051621, 32.616121846), (-15.927331684, 33.45))
            Line((-15.927331684, 33.45), (-22.285, 33.45))
            Line((-22.285, 33.45), (-22.285, 31.75))
            Line((-22.285, 31.75), (-16.26, 31.75))
        make_face()
    extrude(amount=CUT_EXTRUDE_8_DEPTH, mode=Mode.SUBTRACT)

    # 草图26 → 凸台-拉伸14 (add, symmetric)
    with BuildSketch(Plane(origin=(0, 0, 0), x_dir=(0, 0, -1), z_dir=(1, 0, 0))):
        with Locations((1.05, -12.76)):
            Rectangle(SKETCH_26_W, SKETCH_26_H)
        Polygon((8.1, -11.76), (8.1, -13.76), (6.1, -13.76), (6.1, -11.76), (6.1, -10.76), (7.1, -10.76), align=None)
    extrude(amount=EXTRUDE_14_DEPTH, both=True)

    # 草图27 → 凸台-拉伸15 (add)
    with BuildSketch(Plane(origin=(0, 0, 0), x_dir=(-1, 0, 0), z_dir=(0, 0, -1))):
        with BuildLine():
            Line((-11.75, -11.76), (-11.75, -13.58))
            Line((-11.75, -13.58), (-20.58, -13.58))
            Line((-20.58, -13.58), (-20.58, -10.58))
            Line((-20.58, -10.58), (-14.791578538, -10.58))
            ThreePointArc((-14.791578538, -10.58), (-13.381226532, -11.454664077), (-11.75, -11.76))
        make_face()
    extrude(amount=EXTRUDE_15_DEPTH)

    # 草图28 → 切除-拉伸9 (cut, up to next)
    with BuildSketch(Plane.XZ.offset(13.58), mode=Mode.PRIVATE) as cut_extrude_9_sk1:
        with Locations((18.18, -15.755)):
            Circle(SKETCH_28_R)
    cut_extrude_9_tool1 = extrude(cut_extrude_9_sk1.sketch, amount=-CUT_EXTRUDE_9_REACH, mode=Mode.PRIVATE) & part_1.part
    add(cut_extrude_9_tool1.solids().sort_by_distance((18.18, -13.58, -15.755))[0], mode=Mode.SUBTRACT)

    # 草图29 → 凸台-拉伸16 (add)
    with BuildSketch(Plane.XY.offset(4).offset(EXTRUDE_START_2)):
        with BuildLine():
            Line((-20.26, -9.58), (-15.611502298, -9.58))
            ThreePointArc((-15.611502298, -9.58), (-13.967182897, -11.177365529), (-11.75, -11.76))
            Line((-11.75, -11.76), (-11.75, -13.58))
            Line((-11.75, -13.58), (-20.26, -13.58))
            Line((-20.26, -13.58), (-20.26, -9.58))
        make_face()
    extrude(amount=EXTRUDE_16_DEPTH)

    # 圆角2
    # the kernel refuses this fillet: 5 mm, written as the material it adds along each edge
    with BuildSketch(Plane(origin=(-15.611502298, -9.58, 0), x_dir=(-0.13122927433436546, 0.9913520452178812, 0), z_dir=(0, 0, 1))) as fillet_2_piece_1:
        with BuildLine():
            CenterArc((5.597861587, 4.956760226), FILLET_2_R, 183.996325889, 78.463040967)
            Line((0.61001898, 4.608297704), (0.111234719, 4.573451452))
            ThreePointArc((0.111234719, 4.573451452), (-0.190666533, 2.369763489), (-0.495676023, 0.065614637))
            Line((-0.495676023, 0.065614637), (0.199901122, -0.458300711))
            ThreePointArc((0.199901122, -0.458300711), (2.329337511, -0.158550709), (4.876100578, -0.495676023))
            Line((4.876100578, -0.495676023), (4.941715215, 0))
        make_face()
    extrude(amount=4)

    # 草图30 → 切除-拉伸10 (cut, through all)
    with BuildSketch(Plane(origin=(0, -9.58, 0), x_dir=(1, 0, 0), z_dir=(0, 1, 0))):
        with Locations(Location((-17.76, 3.05, 0), (0, 0, 270))):
            Circle(SKETCH_30_R)
    extrude(amount=-CUT_EXTRUDE_10_DEPTH, mode=Mode.SUBTRACT)


solid = part_1.part
